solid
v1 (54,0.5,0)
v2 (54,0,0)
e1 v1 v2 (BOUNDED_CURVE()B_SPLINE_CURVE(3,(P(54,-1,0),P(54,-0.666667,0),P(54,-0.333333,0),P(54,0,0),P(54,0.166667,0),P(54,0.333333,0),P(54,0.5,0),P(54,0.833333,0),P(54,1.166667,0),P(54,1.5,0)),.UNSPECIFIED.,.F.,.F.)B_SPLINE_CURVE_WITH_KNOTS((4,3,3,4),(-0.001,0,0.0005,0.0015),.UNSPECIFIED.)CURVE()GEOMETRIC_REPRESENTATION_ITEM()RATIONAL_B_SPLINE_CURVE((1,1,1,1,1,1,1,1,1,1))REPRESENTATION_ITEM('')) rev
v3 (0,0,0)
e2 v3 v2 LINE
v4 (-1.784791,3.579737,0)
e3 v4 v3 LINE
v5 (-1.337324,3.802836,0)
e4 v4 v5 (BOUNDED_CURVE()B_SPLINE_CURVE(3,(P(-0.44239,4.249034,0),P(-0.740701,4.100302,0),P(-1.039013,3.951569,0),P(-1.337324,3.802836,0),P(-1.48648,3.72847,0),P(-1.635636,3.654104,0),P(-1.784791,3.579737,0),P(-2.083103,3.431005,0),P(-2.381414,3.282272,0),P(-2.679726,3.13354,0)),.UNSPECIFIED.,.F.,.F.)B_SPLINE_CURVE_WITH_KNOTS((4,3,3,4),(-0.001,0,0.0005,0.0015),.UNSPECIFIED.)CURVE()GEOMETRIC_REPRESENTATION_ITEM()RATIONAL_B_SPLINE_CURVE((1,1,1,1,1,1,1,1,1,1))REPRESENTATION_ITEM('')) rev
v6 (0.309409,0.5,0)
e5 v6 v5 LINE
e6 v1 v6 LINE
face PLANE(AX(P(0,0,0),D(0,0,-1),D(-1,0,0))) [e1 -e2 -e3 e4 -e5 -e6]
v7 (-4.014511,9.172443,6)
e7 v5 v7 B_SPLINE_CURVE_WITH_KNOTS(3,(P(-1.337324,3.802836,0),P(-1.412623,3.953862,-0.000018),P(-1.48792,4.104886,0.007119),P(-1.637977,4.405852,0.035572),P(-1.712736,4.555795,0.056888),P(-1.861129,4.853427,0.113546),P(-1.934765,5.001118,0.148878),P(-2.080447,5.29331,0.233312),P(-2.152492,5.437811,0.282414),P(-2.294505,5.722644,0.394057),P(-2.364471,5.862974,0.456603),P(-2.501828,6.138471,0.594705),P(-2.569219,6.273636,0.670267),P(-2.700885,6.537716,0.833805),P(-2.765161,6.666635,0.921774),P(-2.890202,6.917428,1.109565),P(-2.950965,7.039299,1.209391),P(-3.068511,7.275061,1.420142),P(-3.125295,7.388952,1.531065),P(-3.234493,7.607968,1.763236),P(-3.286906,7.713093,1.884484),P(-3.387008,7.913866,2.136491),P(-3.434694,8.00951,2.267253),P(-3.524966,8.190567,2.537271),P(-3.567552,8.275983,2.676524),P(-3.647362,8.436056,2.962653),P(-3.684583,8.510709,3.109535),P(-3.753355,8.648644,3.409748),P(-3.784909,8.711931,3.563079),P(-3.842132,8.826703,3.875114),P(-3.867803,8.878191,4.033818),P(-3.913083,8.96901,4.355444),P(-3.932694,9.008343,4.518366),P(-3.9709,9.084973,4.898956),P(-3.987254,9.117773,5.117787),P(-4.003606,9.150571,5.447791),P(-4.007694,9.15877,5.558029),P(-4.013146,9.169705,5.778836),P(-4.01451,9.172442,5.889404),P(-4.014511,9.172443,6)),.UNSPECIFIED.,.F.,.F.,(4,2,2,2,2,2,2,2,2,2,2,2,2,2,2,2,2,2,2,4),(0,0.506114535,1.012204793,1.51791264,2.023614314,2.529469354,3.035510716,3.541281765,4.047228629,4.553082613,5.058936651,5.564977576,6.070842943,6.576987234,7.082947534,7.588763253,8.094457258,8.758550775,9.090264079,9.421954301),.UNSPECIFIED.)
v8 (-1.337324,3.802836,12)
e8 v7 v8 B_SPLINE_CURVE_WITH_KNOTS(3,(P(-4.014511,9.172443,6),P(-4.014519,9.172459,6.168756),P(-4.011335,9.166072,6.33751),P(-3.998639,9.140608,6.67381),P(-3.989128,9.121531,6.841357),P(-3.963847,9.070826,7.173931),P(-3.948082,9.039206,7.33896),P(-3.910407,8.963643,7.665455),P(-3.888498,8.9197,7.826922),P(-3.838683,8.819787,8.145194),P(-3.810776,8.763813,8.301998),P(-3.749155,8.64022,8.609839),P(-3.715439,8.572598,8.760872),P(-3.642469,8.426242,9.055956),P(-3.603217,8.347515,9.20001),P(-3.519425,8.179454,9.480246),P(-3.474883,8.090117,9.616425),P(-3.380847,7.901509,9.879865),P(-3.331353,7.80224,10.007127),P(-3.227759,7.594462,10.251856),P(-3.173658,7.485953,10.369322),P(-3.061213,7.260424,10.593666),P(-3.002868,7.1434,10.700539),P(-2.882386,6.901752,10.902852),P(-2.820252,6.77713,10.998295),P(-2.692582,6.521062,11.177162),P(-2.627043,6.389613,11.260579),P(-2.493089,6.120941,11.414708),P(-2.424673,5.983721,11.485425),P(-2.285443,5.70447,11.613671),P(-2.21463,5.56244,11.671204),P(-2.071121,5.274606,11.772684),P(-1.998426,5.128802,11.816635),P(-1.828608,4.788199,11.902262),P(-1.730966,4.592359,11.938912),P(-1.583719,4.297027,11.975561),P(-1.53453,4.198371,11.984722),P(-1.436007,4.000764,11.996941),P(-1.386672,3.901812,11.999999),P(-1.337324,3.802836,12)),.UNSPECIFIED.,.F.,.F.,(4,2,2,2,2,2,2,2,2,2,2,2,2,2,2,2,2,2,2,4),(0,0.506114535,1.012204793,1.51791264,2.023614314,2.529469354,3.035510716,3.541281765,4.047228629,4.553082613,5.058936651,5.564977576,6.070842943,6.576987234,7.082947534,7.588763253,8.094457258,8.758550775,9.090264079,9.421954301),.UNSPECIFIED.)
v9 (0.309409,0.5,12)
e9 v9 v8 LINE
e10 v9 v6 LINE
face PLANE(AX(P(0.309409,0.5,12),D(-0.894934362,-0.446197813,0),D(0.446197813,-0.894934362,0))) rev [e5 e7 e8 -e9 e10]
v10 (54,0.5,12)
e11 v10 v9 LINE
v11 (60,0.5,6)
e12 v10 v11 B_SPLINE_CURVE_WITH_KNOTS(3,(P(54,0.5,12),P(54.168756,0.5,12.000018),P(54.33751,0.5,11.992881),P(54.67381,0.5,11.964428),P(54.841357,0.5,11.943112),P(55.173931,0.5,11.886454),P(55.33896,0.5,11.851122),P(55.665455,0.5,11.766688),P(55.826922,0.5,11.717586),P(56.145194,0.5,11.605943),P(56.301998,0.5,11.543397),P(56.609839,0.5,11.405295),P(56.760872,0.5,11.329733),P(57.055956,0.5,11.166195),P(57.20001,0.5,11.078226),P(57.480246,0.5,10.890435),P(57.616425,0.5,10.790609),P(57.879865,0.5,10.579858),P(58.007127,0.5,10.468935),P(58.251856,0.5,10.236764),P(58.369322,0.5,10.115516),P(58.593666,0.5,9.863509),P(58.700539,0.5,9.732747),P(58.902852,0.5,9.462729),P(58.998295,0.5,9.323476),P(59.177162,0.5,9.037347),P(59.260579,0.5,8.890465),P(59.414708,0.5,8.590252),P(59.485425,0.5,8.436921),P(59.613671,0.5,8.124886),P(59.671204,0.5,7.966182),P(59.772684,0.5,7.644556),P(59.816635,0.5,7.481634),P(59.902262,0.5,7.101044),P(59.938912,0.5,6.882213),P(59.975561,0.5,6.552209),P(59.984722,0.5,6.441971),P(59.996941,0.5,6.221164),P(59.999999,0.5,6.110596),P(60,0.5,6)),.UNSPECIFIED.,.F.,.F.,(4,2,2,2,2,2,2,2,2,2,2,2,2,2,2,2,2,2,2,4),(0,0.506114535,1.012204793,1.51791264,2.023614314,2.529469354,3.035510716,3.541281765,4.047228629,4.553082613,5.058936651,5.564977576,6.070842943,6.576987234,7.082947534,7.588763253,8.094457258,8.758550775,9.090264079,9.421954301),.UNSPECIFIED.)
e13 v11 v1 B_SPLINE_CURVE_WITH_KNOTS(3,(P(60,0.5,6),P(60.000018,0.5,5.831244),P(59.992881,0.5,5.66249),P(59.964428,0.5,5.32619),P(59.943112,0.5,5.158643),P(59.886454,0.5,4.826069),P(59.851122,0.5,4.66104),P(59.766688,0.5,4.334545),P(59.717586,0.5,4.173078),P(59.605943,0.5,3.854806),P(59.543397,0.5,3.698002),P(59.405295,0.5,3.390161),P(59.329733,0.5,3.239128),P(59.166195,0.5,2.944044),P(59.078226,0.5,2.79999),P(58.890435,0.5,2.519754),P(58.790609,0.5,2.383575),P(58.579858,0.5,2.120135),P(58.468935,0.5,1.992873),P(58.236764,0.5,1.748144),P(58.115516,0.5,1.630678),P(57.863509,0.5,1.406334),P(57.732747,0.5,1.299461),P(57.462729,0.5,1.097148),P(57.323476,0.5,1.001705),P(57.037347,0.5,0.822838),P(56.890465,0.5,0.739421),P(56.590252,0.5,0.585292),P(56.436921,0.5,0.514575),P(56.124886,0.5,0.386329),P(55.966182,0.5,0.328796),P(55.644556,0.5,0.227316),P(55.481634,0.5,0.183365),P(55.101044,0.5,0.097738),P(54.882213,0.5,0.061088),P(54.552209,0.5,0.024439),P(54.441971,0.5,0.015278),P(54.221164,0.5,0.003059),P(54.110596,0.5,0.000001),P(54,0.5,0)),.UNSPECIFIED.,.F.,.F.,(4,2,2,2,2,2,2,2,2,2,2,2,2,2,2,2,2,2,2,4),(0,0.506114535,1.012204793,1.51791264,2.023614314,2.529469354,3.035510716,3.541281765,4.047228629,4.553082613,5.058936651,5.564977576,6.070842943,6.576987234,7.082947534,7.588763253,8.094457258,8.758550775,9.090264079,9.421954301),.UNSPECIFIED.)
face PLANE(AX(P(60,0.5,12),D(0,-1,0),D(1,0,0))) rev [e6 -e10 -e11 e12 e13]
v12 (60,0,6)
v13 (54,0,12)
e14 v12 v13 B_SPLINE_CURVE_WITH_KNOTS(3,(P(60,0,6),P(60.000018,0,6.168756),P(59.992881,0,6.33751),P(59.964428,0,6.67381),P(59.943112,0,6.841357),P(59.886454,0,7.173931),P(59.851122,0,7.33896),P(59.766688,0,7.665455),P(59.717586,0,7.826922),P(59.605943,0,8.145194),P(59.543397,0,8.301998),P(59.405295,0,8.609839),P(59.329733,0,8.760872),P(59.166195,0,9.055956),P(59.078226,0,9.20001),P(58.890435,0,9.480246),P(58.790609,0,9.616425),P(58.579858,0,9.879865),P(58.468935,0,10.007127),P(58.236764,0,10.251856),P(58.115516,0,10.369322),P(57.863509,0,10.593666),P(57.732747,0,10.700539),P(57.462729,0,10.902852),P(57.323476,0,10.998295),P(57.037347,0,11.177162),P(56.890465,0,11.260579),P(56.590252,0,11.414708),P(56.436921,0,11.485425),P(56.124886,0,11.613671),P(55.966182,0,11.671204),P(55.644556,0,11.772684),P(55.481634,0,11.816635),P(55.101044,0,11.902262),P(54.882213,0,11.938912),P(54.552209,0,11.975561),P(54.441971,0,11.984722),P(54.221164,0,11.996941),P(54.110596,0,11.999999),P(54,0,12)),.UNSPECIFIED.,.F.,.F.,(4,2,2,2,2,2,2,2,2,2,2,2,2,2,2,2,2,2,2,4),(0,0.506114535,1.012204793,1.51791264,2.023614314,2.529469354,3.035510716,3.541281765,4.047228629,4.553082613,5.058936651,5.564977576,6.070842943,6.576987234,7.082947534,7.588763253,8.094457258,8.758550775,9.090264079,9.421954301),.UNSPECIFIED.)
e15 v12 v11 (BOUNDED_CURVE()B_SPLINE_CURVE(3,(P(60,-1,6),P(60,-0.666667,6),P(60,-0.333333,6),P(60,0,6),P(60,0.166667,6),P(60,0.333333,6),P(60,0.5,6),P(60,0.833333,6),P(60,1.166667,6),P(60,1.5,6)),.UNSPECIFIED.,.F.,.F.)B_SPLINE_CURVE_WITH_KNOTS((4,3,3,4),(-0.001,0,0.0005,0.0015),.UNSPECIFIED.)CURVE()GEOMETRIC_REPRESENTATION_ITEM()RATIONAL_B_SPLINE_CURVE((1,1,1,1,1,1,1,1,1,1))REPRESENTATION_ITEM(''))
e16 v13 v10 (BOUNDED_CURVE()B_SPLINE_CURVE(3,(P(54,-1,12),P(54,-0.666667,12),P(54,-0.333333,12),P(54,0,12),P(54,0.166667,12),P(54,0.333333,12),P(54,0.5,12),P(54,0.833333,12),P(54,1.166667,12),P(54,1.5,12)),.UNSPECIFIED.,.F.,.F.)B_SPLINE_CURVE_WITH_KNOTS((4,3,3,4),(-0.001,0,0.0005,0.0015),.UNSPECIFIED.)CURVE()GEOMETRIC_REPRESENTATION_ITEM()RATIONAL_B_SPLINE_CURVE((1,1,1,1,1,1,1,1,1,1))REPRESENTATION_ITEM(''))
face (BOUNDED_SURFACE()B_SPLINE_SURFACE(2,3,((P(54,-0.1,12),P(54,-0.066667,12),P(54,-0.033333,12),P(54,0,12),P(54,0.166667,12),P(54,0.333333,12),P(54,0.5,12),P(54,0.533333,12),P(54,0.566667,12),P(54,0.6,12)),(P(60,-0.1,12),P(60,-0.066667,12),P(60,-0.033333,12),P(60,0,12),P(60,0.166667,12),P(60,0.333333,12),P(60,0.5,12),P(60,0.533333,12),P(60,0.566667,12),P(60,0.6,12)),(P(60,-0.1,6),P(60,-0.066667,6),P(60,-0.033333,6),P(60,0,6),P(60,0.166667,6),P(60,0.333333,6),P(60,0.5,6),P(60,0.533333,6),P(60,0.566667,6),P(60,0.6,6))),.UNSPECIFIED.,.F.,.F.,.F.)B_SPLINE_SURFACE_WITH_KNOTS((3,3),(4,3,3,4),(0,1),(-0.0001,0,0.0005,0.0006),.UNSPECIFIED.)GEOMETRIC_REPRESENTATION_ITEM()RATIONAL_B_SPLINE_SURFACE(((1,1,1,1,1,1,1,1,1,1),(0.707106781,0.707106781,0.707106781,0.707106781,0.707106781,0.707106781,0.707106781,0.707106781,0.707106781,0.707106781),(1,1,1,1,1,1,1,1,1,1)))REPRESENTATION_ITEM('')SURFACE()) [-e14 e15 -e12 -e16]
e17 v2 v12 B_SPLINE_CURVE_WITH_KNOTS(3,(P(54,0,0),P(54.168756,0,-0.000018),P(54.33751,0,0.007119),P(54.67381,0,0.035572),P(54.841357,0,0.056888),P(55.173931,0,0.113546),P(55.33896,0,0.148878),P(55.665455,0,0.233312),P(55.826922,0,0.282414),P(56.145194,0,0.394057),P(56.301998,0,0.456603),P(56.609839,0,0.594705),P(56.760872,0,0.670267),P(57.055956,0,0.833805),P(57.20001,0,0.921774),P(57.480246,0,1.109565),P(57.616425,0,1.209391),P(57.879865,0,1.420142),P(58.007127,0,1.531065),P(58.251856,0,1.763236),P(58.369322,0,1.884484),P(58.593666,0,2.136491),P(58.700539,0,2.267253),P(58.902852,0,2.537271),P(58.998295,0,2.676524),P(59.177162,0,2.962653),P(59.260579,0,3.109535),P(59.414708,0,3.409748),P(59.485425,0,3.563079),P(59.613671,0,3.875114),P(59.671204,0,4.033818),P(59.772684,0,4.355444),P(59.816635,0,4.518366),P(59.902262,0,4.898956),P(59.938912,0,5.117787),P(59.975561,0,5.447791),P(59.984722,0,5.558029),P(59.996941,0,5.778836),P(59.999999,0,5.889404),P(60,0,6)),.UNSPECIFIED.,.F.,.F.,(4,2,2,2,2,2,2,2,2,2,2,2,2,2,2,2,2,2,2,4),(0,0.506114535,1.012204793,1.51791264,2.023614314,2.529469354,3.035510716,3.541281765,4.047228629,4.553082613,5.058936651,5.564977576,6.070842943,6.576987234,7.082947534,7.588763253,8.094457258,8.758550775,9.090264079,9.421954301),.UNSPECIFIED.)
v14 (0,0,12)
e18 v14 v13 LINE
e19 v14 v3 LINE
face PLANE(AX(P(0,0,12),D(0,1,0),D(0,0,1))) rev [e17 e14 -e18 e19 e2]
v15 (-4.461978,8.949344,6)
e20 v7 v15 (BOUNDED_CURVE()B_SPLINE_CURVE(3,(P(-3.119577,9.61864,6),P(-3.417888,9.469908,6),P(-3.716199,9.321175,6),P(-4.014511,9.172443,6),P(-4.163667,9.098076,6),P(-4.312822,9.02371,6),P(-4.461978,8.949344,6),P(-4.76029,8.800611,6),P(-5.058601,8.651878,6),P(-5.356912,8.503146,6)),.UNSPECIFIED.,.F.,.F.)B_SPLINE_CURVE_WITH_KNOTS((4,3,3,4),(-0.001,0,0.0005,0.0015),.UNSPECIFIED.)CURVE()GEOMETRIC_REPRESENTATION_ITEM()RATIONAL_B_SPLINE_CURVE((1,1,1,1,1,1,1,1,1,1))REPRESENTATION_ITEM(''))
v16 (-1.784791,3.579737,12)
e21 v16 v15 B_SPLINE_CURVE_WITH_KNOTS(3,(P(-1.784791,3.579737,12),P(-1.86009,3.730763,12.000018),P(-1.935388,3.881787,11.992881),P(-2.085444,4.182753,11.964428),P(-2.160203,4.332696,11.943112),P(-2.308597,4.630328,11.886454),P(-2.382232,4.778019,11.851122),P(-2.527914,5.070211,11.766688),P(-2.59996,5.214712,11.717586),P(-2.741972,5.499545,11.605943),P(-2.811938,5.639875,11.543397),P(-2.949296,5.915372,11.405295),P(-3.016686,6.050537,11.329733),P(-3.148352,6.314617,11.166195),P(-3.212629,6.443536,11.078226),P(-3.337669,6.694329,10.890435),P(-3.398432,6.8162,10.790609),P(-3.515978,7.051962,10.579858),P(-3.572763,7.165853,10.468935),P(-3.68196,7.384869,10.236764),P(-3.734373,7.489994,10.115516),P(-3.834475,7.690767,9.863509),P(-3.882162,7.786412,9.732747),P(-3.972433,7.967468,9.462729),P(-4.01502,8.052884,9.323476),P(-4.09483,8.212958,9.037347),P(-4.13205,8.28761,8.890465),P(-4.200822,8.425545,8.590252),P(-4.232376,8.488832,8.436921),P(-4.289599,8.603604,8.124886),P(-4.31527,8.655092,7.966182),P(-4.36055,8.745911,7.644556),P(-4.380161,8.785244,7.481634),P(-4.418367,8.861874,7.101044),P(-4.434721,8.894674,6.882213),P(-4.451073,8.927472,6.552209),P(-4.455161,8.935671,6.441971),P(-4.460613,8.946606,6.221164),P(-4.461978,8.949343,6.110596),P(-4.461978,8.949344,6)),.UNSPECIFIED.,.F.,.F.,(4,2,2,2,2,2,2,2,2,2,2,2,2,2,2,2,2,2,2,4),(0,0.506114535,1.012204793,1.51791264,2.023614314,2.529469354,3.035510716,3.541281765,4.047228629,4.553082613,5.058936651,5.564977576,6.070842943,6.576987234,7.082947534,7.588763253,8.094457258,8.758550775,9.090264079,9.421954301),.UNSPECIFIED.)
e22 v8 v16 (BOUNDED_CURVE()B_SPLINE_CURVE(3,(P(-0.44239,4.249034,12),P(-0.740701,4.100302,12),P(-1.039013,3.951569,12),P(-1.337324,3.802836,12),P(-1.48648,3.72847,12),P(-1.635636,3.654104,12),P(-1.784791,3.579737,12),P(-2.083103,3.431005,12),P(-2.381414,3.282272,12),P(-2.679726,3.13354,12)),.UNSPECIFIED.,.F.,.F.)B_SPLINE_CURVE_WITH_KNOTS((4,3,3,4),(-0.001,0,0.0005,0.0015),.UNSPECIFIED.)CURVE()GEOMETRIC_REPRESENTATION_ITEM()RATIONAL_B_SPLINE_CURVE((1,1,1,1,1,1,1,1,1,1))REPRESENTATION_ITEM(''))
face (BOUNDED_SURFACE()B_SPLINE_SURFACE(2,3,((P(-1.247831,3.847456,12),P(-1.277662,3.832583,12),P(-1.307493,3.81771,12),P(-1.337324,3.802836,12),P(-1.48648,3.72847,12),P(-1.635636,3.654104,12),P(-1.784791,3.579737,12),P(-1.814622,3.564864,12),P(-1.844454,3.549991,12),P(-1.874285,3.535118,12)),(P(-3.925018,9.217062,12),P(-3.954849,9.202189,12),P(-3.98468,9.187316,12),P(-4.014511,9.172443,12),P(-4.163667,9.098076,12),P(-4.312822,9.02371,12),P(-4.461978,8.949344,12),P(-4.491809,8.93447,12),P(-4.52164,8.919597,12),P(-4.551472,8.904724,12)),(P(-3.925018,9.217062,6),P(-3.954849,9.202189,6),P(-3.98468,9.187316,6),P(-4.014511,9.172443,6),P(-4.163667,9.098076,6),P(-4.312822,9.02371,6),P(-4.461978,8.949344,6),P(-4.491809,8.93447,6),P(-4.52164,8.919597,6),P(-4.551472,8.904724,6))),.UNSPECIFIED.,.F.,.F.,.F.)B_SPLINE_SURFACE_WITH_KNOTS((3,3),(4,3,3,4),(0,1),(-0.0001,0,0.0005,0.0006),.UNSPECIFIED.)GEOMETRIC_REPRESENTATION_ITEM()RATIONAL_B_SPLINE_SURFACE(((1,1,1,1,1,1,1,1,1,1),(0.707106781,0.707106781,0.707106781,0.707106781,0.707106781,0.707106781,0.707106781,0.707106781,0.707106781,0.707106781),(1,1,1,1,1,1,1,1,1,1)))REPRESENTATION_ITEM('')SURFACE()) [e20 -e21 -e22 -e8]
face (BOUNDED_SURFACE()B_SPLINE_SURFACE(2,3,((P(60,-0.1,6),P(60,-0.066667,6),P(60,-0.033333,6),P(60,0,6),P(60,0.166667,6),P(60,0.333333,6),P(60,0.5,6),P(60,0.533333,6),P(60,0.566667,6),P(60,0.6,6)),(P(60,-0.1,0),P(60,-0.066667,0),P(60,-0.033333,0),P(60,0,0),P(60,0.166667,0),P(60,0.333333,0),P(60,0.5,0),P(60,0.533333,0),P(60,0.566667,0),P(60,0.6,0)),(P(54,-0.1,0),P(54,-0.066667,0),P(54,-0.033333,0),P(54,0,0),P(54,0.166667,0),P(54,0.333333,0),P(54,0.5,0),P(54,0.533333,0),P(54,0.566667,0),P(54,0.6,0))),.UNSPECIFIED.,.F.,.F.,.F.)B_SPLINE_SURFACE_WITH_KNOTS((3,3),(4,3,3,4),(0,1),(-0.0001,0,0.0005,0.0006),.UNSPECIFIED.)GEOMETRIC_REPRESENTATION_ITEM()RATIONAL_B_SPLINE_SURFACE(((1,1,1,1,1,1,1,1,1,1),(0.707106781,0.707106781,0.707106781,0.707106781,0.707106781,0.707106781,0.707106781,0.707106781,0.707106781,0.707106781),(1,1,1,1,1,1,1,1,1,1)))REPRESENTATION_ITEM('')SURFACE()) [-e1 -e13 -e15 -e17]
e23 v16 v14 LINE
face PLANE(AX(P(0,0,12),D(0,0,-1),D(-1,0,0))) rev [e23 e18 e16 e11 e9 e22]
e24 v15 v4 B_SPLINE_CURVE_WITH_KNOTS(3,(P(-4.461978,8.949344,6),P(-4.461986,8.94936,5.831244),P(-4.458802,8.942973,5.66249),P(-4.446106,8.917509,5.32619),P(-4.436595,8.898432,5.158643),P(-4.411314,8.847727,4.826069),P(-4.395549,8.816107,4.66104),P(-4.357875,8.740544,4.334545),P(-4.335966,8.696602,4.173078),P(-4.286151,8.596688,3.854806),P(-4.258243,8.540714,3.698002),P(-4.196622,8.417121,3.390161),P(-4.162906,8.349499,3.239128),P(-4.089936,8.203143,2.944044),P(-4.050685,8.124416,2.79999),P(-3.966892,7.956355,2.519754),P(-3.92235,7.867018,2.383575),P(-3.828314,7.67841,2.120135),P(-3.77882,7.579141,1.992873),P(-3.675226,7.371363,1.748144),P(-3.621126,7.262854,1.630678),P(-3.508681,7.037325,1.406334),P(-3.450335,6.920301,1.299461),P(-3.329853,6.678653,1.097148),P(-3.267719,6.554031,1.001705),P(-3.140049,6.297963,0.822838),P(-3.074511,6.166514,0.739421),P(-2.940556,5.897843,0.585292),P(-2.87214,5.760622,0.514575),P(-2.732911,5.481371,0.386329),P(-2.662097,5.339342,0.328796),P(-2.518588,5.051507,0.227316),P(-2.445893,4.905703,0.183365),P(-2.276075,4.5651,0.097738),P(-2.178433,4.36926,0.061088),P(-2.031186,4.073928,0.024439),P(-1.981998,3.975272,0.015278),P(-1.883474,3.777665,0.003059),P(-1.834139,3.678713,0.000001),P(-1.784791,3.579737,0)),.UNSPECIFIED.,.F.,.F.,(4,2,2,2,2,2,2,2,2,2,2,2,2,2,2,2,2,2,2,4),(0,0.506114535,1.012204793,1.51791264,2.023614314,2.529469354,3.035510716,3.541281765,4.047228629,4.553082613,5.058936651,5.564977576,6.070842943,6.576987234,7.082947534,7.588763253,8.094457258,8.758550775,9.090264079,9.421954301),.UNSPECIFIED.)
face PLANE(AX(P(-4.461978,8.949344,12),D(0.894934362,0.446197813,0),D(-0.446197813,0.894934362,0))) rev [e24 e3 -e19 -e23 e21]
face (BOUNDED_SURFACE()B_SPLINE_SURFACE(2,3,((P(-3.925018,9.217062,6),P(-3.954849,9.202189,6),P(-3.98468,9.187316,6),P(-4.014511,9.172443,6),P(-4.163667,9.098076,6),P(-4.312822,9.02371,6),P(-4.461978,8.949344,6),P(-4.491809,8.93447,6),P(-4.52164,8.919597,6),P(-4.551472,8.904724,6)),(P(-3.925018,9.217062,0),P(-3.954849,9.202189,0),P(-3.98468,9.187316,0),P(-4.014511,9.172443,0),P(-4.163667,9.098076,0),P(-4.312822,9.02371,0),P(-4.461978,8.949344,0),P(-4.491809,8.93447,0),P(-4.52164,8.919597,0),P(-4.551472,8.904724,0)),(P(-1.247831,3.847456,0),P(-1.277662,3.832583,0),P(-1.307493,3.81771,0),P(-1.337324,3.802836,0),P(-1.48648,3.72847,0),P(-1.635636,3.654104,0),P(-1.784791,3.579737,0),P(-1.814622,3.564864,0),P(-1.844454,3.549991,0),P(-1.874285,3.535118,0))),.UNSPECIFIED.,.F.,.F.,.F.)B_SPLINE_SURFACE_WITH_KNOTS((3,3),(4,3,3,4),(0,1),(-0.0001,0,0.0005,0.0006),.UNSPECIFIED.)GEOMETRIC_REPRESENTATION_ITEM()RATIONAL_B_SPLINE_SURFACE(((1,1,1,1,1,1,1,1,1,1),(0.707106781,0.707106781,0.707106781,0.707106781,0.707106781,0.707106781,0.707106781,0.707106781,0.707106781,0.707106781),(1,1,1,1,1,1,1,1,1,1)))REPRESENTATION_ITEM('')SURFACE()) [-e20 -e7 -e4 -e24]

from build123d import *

# Parameters (mm, degrees)
RESSALTO_EXTRUS_O1_DEPTH = 12
FILETE1_START            = -1
FILETE1_DEPTH            = 5.566394674
FILETE1_2_DEPTH          = 0.5


with BuildPart() as part:
    # Esboço1 → Ressalto-extrusão1 (new body)
    with BuildSketch(Plane.XY):
        Polygon((0, 0), (60, 0), (60, 0.5), (0.309409388, 0.5), (-4.01451095, 9.172442523), (-4.461978131, 8.949343616), align=None)
    extrude(amount=RESSALTO_EXTRUS_O1_DEPTH)

    # Filete1: read off the stored shape, not the designer's step
    # Filete1 outline → Filete1 (cut)
    with BuildSketch(Plane(origin=(0, 0, 0), x_dir=(1, 0, 0), z_dir=(0, 1, 0)).offset(FILETE1_START)):
        with BuildLine():
            Line((60, -12), (60, -6))
            add(Edge.make_bspline(
                [(54, -12), (60, -12), (60, -6)],
                knots=[0, 0, 0, 1, 1, 1], degree=2, weights=[1, 0.707106781, 1]))
            Line((54, -12), (60, -12))
        make_face()
        with BuildLine():
            add(Edge.make_bspline(
                [(60, -6), (60, 0), (54, 0)],
                knots=[0, 0, 0, 1, 1, 1], degree=2, weights=[1, 0.707106781, 1]))
            Line((60, -6), (60, 0))
            Line((60, 0), (54, 0))
        make_face()
    extrude(amount=FILETE1_DEPTH, mode=Mode.SUBTRACT)

    # Filete1 2 outline → Filete1 2 (cut)
    with BuildSketch(Plane(origin=(0, 0, 0), x_dir=(0.44619781310978035, -0.8949343616020392, 0), z_dir=(0.8949343616020393, 0.44619781310977996, 0))):
        with BuildLine():
            Line((-10, 0), (-10, -6))
            add(Edge.make_bspline(
                [(-10, -6), (-10, 0), (-4, 0)],
                knots=[0, 0, 0, 1, 1, 1], degree=2, weights=[1, 0.707106781, 1]))
            Line((-4, 0), (-10, 0))
        make_face()
        with BuildLine():
            add(Edge.make_bspline(
                [(-4, -12), (-10, -12), (-10, -6)],
                knots=[0, 0, 0, 1, 1, 1], degree=2, weights=[1, 0.707106781, 1]))
            Line((-10, -6), (-10, -12))
            Line((-10, -12), (-4, -12))
        make_face()
    extrude(amount=FILETE1_2_DEPTH, mode=Mode.SUBTRACT)


solid = part.part
